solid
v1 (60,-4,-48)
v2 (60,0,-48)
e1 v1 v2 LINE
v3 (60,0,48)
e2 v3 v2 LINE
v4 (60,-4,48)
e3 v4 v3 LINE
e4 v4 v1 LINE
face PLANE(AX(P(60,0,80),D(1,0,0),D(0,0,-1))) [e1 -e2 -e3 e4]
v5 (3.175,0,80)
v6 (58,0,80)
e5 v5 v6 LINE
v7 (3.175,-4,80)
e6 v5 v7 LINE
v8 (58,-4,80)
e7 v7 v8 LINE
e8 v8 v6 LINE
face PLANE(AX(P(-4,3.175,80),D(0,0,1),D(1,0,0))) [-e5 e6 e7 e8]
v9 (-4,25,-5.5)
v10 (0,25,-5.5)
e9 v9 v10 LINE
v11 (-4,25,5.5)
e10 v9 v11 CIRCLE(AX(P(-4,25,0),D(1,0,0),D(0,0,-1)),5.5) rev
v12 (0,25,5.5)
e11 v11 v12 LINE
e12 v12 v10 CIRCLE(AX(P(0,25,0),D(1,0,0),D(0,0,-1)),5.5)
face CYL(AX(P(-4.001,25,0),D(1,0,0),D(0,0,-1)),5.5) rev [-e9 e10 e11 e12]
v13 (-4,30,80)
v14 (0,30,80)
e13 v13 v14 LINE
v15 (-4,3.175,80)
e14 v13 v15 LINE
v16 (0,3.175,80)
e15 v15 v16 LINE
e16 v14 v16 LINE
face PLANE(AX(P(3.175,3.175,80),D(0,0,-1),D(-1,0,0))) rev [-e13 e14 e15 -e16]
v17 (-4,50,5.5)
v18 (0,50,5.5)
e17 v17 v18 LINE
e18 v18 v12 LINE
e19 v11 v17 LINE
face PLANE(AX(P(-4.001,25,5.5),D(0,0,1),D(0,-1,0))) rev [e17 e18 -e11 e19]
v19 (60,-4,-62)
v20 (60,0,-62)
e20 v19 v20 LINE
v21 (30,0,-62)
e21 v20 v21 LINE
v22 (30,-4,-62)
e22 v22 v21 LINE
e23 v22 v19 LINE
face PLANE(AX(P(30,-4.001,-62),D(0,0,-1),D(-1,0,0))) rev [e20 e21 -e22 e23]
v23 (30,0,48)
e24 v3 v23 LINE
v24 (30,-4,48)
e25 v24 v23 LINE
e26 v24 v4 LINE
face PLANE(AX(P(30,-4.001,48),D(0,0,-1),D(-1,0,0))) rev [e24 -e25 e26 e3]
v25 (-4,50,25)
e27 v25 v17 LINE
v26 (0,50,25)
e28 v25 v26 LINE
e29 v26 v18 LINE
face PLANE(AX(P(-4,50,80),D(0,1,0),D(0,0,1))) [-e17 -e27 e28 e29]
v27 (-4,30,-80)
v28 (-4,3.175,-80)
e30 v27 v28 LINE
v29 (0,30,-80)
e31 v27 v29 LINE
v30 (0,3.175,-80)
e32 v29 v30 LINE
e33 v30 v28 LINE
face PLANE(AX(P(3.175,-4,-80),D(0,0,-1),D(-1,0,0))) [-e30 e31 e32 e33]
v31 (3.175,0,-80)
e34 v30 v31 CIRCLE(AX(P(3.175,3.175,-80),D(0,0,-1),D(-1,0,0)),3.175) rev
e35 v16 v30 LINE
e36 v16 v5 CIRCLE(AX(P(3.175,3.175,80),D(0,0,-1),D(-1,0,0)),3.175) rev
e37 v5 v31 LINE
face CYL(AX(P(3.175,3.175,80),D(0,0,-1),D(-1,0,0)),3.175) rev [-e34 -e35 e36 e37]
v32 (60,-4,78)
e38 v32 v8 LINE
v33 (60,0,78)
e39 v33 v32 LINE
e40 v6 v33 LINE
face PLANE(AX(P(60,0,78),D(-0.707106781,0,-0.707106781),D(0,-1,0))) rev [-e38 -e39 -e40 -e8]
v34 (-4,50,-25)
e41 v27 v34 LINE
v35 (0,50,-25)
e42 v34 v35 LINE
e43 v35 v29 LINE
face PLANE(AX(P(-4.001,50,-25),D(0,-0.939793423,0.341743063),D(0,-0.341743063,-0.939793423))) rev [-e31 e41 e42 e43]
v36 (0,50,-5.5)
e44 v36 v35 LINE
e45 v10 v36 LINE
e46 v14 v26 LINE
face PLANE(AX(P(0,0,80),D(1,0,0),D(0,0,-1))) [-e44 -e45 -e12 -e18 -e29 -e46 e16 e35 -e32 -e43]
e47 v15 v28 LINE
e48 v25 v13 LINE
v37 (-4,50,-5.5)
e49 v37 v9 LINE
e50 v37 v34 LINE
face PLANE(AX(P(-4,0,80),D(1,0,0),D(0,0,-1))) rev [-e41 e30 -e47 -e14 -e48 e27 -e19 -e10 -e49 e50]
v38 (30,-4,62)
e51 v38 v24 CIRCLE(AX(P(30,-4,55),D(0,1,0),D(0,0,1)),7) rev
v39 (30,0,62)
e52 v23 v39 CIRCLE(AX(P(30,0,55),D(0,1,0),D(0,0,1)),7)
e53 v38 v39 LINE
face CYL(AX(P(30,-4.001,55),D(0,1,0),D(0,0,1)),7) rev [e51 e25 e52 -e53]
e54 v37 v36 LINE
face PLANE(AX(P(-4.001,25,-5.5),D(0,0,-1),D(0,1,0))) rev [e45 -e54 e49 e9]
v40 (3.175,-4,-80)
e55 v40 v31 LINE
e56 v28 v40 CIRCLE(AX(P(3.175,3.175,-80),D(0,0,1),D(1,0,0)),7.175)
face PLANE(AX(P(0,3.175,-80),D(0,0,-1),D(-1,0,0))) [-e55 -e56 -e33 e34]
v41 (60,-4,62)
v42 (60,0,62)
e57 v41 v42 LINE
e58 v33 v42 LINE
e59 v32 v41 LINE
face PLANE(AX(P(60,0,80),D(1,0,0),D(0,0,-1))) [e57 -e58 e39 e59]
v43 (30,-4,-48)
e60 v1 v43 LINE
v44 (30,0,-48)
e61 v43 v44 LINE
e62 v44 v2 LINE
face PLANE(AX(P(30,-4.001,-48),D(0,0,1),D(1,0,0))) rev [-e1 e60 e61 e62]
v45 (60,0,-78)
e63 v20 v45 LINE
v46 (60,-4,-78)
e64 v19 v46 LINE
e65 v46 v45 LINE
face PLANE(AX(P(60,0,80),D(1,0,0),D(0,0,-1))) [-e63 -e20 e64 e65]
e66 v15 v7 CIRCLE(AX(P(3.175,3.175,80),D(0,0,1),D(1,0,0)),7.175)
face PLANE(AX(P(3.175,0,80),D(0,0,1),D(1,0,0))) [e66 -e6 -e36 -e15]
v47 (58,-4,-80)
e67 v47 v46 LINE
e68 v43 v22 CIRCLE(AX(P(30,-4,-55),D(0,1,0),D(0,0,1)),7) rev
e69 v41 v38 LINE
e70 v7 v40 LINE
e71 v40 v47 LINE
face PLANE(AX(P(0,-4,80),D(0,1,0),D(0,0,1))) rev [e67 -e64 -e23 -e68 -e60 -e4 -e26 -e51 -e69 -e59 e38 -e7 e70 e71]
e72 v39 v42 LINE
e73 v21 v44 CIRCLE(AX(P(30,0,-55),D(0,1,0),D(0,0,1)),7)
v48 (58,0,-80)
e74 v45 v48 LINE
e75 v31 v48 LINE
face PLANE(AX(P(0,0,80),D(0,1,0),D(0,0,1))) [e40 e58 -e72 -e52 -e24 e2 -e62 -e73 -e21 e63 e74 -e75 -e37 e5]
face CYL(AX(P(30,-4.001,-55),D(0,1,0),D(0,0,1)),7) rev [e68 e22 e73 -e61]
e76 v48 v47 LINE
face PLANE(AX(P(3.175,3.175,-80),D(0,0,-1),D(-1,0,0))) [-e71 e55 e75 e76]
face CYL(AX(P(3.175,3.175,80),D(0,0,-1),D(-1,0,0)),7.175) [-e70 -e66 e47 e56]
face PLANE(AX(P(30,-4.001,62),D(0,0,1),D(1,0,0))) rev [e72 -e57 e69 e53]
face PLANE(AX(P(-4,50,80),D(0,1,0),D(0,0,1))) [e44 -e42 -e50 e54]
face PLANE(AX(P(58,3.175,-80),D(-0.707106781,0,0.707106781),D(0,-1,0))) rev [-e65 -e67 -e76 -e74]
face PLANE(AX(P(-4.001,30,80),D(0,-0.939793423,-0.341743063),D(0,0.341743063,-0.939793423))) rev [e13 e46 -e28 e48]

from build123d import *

# Parameters (mm, degrees)
BASE_FLANGE1_DEPTH = 80
CUT_EXTRUDE1_REACH = 113.803
CUT_EXTRUDE2_REACH = 113.803
CUT_EXTRUDE3_REACH = 113.803
CHAMFER1_SIZE      = 2


# Sheet-metal steps are written as plain solids
with BuildPart() as part:
    # Sketch1 → Base-Flange1 (new, symmetric)
    with BuildSketch(Plane.XY):
        with BuildLine():
            Line((60, 0), (3.175, 0))
            ThreePointArc((3.175, 0), (0.92993597, 0.92993597), (0, 3.175))
            Line((0, 3.175), (0, 50))
            Line((0, 50), (-4, 50))
            Line((-4, 50), (-4, 3.175))
            ThreePointArc((-4, 3.175), (-1.898491155, -1.898491155), (3.175, -4))
            Line((3.175, -4), (60, -4))
            Line((60, -4), (60, 0))
        make_face()
    extrude(amount=BASE_FLANGE1_DEPTH, both=True)

    # Sketch6 → Cut-Extrude1 (cut, up to next)
    with BuildSketch(Plane(origin=(0, 0, 0), x_dir=(0, 0, -1), z_dir=(1, 0, 0)), mode=Mode.PRIVATE) as cut_extrude1_sk1:
        with BuildLine():
            Line((5.5, 25), (5.5, 50))
            Line((5.5, 50), (-5.5, 50))
            Line((-5.5, 50), (-5.5, 25))
            ThreePointArc((-5.5, 25), (0, 19.5), (5.5, 25))
        make_face()
    cut_extrude1_tool1 = extrude(cut_extrude1_sk1.sketch, amount=-CUT_EXTRUDE1_REACH, mode=Mode.PRIVATE) & part.part
    add(cut_extrude1_tool1.solids().sort_by_distance((0, 35.314457, 0))[0], mode=Mode.SUBTRACT)

    # Sketch8 → Cut-Extrude2 (cut, up to next)
    with BuildSketch(Plane(origin=(0, 0, 0), x_dir=(0, 0, -1), z_dir=(1, 0, 0)), mode=Mode.PRIVATE) as cut_extrude2_sk1:
        Polygon((-80, 30), (-25, 50), (-80, 50), align=None)
    cut_extrude2_tool1 = extrude(cut_extrude2_sk1.sketch, amount=-CUT_EXTRUDE2_REACH, mode=Mode.PRIVATE) & part.part
    # Sketch8 → Cut-Extrude2 (cut, up to next)
    with BuildSketch(Plane(origin=(0, 0, 0), x_dir=(0, 0, -1), z_dir=(1, 0, 0)), mode=Mode.PRIVATE) as cut_extrude2_sk2:
        Polygon((25, 50), (80, 30), (80, 50), align=None)
    cut_extrude2_tool2 = extrude(cut_extrude2_sk2.sketch, amount=-CUT_EXTRUDE2_REACH, mode=Mode.PRIVATE) & part.part
    add(cut_extrude2_tool1.solids().sort_by_distance((0, 43.333333, 61.666667))[0], mode=Mode.SUBTRACT)
    add(cut_extrude2_tool2.solids().sort_by_distance((0, 43.333333, -61.666667))[0], mode=Mode.SUBTRACT)

    # Sketch9 → Cut-Extrude3 (cut, up to next)
    with BuildSketch(Plane(origin=(0, 0, 0), x_dir=(1, 0, 0), z_dir=(0, 1, 0)), mode=Mode.PRIVATE) as cut_extrude3_sk1:
        with BuildLine():
            Line((30, 62), (60, 62))
            Line((60, 62), (60, 48))
            Line((60, 48), (30, 48))
            ThreePointArc((30, 48), (23, 55), (30, 62))
        make_face()
    cut_extrude3_tool1 = extrude(cut_extrude3_sk1.sketch, amount=-CUT_EXTRUDE3_REACH, mode=Mode.PRIVATE) & part.part
    # Sketch9 → Cut-Extrude3 (cut, up to next)
    with BuildSketch(Plane(origin=(0, 0, 0), x_dir=(1, 0, 0), z_dir=(0, 1, 0)), mode=Mode.PRIVATE) as cut_extrude3_sk2:
        with BuildLine():
            Line((30, -48), (60, -48))
            Line((60, -48), (60, -62))
            Line((60, -62), (30, -62))
            ThreePointArc((30, -62), (23, -55), (30, -48))
        make_face()
    cut_extrude3_tool2 = extrude(cut_extrude3_sk2.sketch, amount=-CUT_EXTRUDE3_REACH, mode=Mode.PRIVATE) & part.part
    add(cut_extrude3_tool1.solids().sort_by_distance((42.216724, 0, -55))[0], mode=Mode.SUBTRACT)
    add(cut_extrude3_tool2.solids().sort_by_distance((42.216724, 0, 55))[0], mode=Mode.SUBTRACT)

    # Chamfer1
    chamfer1_edges = [part.edges().sort_by_distance(p)[0] for p in [
        (60, -2, 80),
        (60, -2, -80),
    ]]
    chamfer(chamfer1_edges, length=CHAMFER1_SIZE)


solid = part.part
